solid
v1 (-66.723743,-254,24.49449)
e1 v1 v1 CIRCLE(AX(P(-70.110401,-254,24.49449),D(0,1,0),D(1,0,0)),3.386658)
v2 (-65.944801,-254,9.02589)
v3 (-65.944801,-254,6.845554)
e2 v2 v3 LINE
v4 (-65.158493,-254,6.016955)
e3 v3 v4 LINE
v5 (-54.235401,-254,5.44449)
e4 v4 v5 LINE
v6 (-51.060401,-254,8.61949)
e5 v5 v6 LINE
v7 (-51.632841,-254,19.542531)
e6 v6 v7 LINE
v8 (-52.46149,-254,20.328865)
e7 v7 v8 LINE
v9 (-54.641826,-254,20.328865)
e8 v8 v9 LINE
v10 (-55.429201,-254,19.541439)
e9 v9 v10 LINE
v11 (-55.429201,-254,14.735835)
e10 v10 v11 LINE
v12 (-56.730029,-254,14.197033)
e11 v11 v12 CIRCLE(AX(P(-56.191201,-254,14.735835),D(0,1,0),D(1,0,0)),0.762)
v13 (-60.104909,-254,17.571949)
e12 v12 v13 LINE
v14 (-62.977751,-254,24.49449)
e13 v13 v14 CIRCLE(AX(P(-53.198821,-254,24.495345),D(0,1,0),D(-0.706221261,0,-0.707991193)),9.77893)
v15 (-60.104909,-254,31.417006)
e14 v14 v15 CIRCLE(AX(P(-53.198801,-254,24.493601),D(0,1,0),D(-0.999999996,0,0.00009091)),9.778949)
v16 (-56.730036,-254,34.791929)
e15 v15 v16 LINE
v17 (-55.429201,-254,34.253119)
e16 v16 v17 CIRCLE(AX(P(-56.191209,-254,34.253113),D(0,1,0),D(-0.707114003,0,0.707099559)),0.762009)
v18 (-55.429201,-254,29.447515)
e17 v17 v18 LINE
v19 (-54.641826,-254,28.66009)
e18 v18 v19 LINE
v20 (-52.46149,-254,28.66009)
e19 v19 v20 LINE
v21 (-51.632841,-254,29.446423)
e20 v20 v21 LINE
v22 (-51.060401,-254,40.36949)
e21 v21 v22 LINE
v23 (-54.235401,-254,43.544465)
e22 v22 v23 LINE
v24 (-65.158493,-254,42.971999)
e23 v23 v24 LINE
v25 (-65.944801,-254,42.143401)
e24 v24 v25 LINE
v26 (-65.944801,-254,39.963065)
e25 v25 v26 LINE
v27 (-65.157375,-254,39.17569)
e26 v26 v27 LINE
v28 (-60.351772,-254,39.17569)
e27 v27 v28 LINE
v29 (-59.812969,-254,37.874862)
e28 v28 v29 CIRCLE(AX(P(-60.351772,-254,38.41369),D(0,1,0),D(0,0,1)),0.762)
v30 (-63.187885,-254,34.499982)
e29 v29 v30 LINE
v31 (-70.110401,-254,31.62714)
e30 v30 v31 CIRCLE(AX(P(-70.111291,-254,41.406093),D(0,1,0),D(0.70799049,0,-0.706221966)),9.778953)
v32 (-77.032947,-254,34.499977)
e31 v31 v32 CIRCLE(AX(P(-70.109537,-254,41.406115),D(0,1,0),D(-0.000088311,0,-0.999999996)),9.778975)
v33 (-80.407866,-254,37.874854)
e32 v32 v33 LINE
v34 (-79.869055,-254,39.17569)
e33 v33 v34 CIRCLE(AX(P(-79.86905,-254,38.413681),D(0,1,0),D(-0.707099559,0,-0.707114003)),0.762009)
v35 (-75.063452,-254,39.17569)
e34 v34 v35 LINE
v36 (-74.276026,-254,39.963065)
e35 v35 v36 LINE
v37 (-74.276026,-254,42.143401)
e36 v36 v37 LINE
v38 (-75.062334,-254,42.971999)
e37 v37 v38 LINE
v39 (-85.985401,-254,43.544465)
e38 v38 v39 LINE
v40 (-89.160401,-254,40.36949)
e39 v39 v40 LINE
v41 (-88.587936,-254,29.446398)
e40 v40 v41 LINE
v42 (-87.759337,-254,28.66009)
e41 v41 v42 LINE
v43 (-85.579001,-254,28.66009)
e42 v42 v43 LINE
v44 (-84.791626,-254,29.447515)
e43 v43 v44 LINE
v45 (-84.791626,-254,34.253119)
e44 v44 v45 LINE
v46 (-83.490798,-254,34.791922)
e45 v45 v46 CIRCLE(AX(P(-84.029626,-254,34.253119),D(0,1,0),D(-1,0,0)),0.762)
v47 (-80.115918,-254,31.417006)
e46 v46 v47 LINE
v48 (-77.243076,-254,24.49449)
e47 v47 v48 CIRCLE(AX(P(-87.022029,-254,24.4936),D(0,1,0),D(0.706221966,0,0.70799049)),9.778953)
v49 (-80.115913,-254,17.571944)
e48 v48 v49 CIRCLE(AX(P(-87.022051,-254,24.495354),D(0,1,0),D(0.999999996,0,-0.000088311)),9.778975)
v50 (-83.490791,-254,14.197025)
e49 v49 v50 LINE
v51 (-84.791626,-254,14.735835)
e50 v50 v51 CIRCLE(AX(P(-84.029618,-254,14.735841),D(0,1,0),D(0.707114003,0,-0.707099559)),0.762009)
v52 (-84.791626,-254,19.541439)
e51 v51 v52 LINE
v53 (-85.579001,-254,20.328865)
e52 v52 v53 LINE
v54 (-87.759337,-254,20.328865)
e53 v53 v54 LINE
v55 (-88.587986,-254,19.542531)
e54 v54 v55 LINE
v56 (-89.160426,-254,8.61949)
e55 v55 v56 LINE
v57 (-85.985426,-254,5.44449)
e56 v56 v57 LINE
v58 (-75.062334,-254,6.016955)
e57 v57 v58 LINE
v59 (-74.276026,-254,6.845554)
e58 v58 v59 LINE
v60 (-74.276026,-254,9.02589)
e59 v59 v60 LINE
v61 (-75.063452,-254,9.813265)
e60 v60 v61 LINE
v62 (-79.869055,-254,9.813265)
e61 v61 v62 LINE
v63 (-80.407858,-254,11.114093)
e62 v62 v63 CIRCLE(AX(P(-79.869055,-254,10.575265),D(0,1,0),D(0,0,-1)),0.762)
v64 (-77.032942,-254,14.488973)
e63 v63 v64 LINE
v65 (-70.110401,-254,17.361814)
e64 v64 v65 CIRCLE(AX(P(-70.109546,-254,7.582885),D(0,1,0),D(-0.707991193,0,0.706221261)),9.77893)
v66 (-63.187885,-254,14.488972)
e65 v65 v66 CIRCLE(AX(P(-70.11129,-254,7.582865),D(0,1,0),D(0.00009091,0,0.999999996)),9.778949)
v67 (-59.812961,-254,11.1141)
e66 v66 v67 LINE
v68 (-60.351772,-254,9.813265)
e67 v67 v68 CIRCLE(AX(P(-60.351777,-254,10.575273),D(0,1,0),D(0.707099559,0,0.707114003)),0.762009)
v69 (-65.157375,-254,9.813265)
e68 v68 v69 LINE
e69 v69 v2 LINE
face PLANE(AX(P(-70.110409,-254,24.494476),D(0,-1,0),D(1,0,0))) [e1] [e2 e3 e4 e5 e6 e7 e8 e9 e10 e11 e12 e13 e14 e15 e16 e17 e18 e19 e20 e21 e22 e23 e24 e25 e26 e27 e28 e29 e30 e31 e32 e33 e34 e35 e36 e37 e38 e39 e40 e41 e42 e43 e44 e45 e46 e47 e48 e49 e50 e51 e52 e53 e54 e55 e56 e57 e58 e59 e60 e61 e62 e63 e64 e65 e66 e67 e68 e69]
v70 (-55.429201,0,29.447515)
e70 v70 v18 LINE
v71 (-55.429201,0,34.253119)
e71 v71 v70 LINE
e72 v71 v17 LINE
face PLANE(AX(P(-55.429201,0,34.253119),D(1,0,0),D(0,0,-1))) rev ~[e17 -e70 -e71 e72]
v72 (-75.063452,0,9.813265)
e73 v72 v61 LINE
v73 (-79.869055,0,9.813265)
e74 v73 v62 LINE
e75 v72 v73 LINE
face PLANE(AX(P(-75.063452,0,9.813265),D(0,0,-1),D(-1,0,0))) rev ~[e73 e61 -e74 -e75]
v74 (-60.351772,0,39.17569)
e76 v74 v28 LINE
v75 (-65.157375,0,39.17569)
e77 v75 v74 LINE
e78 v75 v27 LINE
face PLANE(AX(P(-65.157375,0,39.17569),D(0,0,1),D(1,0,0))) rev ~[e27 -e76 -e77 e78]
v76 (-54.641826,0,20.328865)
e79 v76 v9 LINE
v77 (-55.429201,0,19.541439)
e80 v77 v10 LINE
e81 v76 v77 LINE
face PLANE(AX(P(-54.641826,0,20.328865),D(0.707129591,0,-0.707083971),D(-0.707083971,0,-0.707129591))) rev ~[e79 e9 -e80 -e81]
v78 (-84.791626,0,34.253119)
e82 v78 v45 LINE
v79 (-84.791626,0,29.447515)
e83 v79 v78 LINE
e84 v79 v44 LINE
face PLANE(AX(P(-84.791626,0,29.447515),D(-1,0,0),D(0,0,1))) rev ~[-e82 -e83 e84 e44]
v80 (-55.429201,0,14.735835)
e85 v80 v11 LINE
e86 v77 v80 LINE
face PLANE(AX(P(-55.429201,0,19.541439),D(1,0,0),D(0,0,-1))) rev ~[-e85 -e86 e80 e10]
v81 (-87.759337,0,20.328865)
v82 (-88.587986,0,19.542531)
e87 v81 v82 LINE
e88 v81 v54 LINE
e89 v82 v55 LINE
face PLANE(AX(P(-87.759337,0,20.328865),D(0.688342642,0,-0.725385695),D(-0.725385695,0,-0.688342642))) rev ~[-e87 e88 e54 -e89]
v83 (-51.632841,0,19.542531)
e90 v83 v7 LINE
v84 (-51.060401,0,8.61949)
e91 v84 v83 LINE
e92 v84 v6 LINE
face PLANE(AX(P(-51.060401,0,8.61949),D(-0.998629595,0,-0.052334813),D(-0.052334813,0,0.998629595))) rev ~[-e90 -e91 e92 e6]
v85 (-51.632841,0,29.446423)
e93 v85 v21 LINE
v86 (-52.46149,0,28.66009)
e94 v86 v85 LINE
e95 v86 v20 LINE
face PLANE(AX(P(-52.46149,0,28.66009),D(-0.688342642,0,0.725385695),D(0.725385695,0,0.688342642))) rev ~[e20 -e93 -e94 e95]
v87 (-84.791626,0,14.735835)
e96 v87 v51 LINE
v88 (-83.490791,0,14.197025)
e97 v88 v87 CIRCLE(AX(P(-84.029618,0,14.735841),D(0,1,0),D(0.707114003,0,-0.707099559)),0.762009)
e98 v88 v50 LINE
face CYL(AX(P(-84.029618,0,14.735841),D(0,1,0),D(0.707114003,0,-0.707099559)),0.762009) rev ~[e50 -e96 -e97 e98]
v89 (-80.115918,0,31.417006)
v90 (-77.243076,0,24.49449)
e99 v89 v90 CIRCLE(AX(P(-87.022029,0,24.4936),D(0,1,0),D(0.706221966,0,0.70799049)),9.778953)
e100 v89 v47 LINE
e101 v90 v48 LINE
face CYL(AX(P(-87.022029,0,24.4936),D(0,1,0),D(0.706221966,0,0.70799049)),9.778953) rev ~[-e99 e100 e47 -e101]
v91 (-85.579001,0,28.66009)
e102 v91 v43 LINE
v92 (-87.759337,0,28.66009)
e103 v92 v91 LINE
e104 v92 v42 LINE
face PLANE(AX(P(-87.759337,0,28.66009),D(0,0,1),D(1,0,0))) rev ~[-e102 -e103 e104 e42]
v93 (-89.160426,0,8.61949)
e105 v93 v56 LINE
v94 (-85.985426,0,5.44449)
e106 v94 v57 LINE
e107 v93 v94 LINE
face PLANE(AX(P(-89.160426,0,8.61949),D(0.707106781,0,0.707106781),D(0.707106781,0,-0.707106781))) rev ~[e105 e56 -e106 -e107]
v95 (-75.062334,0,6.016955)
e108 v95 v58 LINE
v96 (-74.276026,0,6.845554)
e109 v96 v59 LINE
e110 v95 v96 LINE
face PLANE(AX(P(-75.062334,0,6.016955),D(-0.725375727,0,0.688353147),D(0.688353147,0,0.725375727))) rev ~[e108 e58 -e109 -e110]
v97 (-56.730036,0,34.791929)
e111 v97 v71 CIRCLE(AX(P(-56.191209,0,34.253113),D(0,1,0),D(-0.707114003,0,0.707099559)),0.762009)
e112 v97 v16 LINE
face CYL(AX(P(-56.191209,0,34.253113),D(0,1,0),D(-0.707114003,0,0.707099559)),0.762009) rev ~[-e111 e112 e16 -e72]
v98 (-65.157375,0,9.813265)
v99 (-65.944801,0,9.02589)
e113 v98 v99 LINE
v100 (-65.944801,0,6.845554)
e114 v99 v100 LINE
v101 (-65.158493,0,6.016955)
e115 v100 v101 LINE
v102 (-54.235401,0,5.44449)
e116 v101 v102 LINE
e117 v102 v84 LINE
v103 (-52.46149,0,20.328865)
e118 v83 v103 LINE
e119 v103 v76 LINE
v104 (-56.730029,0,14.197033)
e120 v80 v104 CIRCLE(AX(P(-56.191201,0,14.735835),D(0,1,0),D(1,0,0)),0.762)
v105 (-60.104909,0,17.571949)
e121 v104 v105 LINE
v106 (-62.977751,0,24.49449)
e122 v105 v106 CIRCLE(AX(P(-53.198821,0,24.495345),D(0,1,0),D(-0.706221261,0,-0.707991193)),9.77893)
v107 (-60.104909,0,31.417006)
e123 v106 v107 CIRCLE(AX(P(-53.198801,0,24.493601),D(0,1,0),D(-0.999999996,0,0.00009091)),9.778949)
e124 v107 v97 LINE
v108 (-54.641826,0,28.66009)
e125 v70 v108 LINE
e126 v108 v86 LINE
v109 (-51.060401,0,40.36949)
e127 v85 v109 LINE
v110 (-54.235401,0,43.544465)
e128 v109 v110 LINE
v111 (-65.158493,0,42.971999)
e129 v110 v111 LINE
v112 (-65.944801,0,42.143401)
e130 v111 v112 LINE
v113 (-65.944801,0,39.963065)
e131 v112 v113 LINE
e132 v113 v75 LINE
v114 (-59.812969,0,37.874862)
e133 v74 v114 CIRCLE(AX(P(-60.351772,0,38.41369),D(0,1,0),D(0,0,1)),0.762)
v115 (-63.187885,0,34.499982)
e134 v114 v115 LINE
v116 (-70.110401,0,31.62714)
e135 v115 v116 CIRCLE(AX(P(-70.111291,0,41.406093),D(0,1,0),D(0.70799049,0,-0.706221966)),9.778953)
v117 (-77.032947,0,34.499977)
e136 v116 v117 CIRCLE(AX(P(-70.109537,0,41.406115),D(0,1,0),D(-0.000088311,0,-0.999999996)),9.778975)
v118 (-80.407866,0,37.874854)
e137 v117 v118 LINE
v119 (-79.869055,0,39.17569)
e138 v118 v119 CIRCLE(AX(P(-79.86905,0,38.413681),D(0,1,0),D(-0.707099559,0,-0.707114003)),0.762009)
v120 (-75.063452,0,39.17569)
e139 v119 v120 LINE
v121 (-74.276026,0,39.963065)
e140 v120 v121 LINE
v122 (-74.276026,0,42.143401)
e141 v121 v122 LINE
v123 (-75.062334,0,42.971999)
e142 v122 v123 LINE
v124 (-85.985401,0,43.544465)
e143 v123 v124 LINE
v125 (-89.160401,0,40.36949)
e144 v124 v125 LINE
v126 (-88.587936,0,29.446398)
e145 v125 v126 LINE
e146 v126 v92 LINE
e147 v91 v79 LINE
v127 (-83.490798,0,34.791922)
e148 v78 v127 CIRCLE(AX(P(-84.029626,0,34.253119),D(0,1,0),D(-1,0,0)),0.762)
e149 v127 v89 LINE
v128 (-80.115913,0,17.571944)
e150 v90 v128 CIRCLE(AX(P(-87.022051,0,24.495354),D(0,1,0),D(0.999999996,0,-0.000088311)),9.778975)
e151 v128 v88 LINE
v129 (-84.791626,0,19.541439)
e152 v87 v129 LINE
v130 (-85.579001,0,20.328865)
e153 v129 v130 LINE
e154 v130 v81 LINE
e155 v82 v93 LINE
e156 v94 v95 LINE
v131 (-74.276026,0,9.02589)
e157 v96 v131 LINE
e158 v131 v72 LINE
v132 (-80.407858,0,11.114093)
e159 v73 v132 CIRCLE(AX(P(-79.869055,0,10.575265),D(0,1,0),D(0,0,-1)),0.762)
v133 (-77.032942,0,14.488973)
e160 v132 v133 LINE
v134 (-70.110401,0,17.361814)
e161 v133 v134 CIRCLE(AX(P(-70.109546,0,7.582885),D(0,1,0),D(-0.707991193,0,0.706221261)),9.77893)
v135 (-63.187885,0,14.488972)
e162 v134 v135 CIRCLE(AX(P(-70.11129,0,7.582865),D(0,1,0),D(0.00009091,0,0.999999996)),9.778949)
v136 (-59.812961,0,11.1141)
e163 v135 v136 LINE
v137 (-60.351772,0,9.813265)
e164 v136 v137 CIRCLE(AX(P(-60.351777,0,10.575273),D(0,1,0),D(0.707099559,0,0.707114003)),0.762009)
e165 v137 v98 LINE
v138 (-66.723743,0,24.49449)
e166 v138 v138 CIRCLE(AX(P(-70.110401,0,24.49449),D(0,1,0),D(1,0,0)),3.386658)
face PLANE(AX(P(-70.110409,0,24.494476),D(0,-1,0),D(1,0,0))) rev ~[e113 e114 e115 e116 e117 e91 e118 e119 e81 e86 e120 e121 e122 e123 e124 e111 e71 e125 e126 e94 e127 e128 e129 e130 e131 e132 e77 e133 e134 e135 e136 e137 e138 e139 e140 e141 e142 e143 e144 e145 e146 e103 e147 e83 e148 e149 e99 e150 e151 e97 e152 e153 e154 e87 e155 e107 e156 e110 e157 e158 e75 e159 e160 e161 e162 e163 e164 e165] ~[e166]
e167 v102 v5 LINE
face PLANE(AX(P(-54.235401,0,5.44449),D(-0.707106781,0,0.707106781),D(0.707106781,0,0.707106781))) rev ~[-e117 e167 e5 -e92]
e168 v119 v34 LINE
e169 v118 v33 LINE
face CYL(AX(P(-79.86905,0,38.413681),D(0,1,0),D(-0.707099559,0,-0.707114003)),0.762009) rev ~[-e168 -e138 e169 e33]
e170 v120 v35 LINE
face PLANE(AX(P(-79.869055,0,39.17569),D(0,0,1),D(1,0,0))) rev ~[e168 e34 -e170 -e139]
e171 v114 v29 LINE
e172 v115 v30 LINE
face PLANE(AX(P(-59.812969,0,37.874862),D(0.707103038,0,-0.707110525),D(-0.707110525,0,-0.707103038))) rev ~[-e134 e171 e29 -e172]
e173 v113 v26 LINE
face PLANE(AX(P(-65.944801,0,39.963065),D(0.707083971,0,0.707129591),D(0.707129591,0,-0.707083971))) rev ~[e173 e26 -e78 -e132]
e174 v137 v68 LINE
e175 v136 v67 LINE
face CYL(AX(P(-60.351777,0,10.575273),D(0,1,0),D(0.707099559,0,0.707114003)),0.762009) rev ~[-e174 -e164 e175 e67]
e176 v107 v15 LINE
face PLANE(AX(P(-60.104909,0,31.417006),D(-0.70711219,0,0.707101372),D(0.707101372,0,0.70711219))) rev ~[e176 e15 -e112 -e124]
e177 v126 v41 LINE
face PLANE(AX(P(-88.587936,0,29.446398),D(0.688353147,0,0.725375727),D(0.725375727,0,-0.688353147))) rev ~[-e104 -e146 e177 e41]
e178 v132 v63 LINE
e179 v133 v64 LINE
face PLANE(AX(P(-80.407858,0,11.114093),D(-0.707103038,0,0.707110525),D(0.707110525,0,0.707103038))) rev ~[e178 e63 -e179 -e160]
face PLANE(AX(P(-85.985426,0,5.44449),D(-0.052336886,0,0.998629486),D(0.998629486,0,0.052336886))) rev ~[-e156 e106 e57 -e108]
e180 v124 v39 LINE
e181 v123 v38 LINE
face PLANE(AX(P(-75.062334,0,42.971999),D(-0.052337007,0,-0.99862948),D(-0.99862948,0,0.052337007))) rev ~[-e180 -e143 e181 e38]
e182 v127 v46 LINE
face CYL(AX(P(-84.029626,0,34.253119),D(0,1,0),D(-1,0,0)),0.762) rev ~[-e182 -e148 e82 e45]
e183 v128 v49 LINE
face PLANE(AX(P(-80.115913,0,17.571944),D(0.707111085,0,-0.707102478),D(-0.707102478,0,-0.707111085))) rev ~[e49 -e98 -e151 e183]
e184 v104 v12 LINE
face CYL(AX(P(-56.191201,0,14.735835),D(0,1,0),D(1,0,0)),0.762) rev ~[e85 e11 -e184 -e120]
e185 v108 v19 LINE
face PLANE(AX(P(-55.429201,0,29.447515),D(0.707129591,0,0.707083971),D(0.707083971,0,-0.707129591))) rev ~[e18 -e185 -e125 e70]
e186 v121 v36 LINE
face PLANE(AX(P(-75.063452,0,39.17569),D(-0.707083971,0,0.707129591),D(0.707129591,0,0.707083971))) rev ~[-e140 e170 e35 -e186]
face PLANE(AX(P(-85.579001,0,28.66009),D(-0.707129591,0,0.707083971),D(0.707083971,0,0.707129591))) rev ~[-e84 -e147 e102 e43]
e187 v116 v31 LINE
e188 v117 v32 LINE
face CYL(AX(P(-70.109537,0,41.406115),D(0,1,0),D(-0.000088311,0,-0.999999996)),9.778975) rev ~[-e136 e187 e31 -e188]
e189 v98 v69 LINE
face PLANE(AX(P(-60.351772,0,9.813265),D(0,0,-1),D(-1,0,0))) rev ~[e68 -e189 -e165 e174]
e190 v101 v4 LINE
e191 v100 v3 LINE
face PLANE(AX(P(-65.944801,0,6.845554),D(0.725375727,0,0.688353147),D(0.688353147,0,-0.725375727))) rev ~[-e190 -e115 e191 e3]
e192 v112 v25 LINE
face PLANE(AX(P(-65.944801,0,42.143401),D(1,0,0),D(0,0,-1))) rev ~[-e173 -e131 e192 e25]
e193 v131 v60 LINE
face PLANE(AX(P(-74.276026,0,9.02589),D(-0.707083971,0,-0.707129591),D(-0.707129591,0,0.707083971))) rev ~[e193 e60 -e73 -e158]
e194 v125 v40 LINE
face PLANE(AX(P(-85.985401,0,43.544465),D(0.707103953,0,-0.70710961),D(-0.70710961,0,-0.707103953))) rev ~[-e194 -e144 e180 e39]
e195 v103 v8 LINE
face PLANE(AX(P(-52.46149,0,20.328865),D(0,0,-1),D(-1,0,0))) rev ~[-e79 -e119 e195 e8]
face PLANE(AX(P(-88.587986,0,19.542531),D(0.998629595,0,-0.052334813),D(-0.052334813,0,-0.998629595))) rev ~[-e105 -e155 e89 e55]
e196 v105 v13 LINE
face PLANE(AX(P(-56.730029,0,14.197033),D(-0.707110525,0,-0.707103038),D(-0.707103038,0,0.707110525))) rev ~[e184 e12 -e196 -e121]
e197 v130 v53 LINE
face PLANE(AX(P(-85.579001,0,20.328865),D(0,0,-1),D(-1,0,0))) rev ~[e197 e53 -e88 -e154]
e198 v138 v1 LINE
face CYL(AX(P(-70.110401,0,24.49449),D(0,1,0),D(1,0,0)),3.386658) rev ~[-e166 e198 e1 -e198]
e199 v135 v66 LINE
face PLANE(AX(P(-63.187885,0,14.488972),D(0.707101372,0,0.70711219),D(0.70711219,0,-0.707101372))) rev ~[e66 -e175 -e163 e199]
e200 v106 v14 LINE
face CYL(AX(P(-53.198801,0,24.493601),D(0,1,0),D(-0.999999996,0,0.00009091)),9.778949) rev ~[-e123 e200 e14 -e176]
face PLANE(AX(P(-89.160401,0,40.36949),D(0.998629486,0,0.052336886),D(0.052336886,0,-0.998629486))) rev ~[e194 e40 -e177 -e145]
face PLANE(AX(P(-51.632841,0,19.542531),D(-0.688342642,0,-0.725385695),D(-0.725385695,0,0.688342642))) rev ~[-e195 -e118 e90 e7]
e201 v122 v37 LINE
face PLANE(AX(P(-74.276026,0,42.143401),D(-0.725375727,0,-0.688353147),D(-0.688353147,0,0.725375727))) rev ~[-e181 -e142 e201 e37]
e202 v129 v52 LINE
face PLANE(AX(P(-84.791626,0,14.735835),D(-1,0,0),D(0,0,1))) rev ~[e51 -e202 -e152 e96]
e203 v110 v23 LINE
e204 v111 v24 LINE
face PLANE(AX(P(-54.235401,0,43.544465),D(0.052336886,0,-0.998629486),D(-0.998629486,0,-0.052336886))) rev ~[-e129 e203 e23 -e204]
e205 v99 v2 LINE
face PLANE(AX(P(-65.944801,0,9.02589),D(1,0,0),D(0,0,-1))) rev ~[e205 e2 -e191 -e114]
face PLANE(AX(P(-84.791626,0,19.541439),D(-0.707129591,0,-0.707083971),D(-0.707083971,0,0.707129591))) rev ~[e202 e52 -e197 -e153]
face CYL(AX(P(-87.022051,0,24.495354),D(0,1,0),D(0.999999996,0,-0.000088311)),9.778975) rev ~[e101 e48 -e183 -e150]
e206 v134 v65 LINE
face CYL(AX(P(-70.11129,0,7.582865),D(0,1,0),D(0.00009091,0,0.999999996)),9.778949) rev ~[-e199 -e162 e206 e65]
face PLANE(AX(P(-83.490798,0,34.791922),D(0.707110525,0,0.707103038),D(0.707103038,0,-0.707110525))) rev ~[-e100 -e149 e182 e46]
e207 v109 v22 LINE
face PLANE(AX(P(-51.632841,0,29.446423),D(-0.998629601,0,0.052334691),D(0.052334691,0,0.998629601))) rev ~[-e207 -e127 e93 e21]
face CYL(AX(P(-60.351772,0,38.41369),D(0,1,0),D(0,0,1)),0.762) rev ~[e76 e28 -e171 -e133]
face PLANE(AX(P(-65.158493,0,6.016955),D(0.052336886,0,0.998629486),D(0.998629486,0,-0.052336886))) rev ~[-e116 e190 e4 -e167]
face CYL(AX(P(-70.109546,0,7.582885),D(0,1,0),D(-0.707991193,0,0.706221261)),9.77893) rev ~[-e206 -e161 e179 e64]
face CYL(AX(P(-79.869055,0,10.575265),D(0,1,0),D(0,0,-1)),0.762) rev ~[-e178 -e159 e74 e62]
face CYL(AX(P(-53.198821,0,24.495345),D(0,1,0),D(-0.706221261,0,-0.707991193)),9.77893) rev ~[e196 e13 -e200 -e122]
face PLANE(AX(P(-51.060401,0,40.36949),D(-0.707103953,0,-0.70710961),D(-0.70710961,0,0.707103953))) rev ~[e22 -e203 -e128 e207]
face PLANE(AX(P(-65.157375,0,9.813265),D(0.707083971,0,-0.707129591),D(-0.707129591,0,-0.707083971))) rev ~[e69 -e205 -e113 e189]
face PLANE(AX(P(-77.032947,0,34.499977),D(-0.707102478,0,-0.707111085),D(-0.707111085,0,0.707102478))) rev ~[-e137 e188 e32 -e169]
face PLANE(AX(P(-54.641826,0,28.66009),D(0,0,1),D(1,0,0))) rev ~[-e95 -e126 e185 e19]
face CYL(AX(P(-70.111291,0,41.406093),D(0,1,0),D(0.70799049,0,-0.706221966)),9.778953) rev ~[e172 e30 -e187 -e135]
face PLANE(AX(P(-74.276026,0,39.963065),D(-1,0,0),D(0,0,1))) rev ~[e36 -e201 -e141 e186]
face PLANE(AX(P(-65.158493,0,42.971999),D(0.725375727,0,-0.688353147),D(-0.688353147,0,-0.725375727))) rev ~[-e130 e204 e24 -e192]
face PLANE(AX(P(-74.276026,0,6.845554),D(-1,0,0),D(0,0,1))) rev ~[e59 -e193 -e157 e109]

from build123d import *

# Parameters (mm, degrees)
F1_DEPTH = 254


# Not quite as in the source:
# - ends of sketch curves that miss each other by under 0.0002 mm in the source are joined


with BuildPart() as f1:
    # F0 (on Front) → F1 (new body)
    with BuildSketch(Plane.XZ):
        with BuildLine():
            Line((-51.0604008, 40.36949), (-54.2354008, 43.5444646))
            Line((-54.2354008, 43.5444646), (-65.158493, 42.9719994))
            Line((-65.158493, 42.9719994), (-65.9448008, 42.1434006))
            Line((-65.9448008, 42.1434006), (-65.9448008, 39.9630646))
            Line((-65.9448008, 39.9630646), (-65.1573754, 39.17569))
            Line((-65.1573754, 39.17569), (-60.3517716, 39.17569))
            ThreePointArc((-60.3517716, 39.17569), (-59.6477719597, 38.7052864789), (-59.8129689327, 37.8748619331))
            Line((-59.8129689327, 37.8748619331), (-63.1878848, 34.4999818))
            ThreePointArc((-63.1878848, 34.4999818), (-66.3629880966, 32.3740308419), (-70.1104008, 31.6271402404))
            ThreePointArc((-70.1104008, 31.6271402404), (-73.8578286035, 32.3740244671), (-77.0329470659, 34.4999769462))
            Line((-77.0329470659, 34.4999769462), (-80.4078656, 37.8748544))
            ThreePointArc((-80.4078656, 37.8748544), (-80.5730550403, 38.7052864789), (-79.8690554, 39.17569))
            Line((-79.8690554, 39.17569), (-75.0634516, 39.17569))
            Line((-75.0634516, 39.17569), (-74.2760262, 39.9630646))
            Line((-74.2760262, 39.9630646), (-74.2760262, 42.1434006))
            Line((-74.2760262, 42.1434006), (-75.062334, 42.9719994))
            Line((-75.062334, 42.9719994), (-85.9854008, 43.5444646))
            Line((-85.9854008, 43.5444646), (-89.1604008, 40.36949))
            Line((-89.1604008, 40.36949), (-88.5879356, 29.4463978))
            Line((-88.5879356, 29.4463978), (-87.7593368, 28.66009))
            Line((-87.7593368, 28.66009), (-85.5790008, 28.66009))
            Line((-85.5790008, 28.66009), (-84.7916262, 29.4475154))
            Line((-84.7916262, 29.4475154), (-84.7916262, 34.2531192))
            ThreePointArc((-84.7916262, 34.2531192), (-84.3212226789, 34.9571188403), (-83.4907981331, 34.7919218673))
            Line((-83.4907981331, 34.7919218673), (-80.115918, 31.417006))
            ThreePointArc((-80.115918, 31.417006), (-77.9899670419, 28.2419027034), (-77.2430764404, 24.49449))
            ThreePointArc((-77.2430764404, 24.49449), (-77.9899606671, 20.7470621965), (-80.1159131462, 17.5719437341))
            Line((-80.1159131462, 17.5719437341), (-83.4907906, 14.1970252))
            ThreePointArc((-83.4907906, 14.1970252), (-84.3212226789, 14.0318357597), (-84.7916262, 14.7358354))
            Line((-84.7916262, 14.7358354), (-84.7916262, 19.5414392))
            Line((-84.7916262, 19.5414392), (-85.5790008, 20.3288646))
            Line((-85.5790008, 20.3288646), (-87.7593368, 20.3288646))
            Line((-87.7593368, 20.3288646), (-88.5879864, 19.5425314))
            Line((-88.5879864, 19.5425314), (-89.1604262, 8.61949))
            Line((-89.1604262, 8.61949), (-85.9854262, 5.44449))
            Line((-85.9854262, 5.44449), (-75.062334, 6.0169552))
            Line((-75.062334, 6.0169552), (-74.2760262, 6.845554))
            Line((-74.2760262, 6.845554), (-74.2760262, 9.02589))
            Line((-74.2760262, 9.02589), (-75.0634516, 9.8132646))
            Line((-75.0634516, 9.8132646), (-79.8690554, 9.8132646))
            ThreePointArc((-79.8690554, 9.8132646), (-80.5730550403, 10.2836681211), (-80.4078580673, 11.1140926669))
            Line((-80.4078580673, 11.1140926669), (-77.0329422, 14.4889728))
            ThreePointArc((-77.0329422, 14.4889728), (-73.8578286035, 16.6149301329), (-70.1104008, 17.3618143619))
            ThreePointArc((-70.1104008, 17.3618143619), (-66.3629880966, 16.6149237581), (-63.187885217, 14.488972384))
            Line((-63.187885217, 14.488972384), (-59.8129614, 11.1141002))
            ThreePointArc((-59.8129614, 11.1141002), (-59.6477719597, 10.2836681211), (-60.3517716, 9.8132646))
            Line((-60.3517716, 9.8132646), (-65.1573754, 9.8132646))
            Line((-65.1573754, 9.8132646), (-65.9448008, 9.02589))
            Line((-65.9448008, 9.02589), (-65.9448008, 6.845554))
            Line((-65.9448008, 6.845554), (-65.158493, 6.0169552))
            Line((-65.158493, 6.0169552), (-54.2354008, 5.44449))
            Line((-54.2354008, 5.44449), (-51.0604008, 8.61949))
            Line((-51.0604008, 8.61949), (-51.6328406, 19.5425314))
            Line((-51.6328406, 19.5425314), (-52.4614902, 20.3288646))
            Line((-52.4614902, 20.3288646), (-54.6418262, 20.3288646))
            Line((-54.6418262, 20.3288646), (-55.4292008, 19.5414392))
            Line((-55.4292008, 19.5414392), (-55.4292008, 14.7358354))
            ThreePointArc((-55.4292008, 14.7358354), (-55.8996043211, 14.0318357597), (-56.7300288669, 14.1970327327))
            Line((-56.7300288669, 14.1970327327), (-60.104909, 17.5719486))
            ThreePointArc((-60.104909, 17.5719486), (-62.2308663329, 20.7470621965), (-62.9777505619, 24.49449))
            ThreePointArc((-62.9777505619, 24.49449), (-62.2308599581, 28.2419027034), (-60.104908584, 31.417005583))
            Line((-60.104908584, 31.417005583), (-56.7300364, 34.7919294))
            ThreePointArc((-56.7300364, 34.7919294), (-55.8996043211, 34.9571188403), (-55.4292008, 34.2531192))
            Line((-55.4292008, 34.2531192), (-55.4292008, 29.4475154))
            Line((-55.4292008, 29.4475154), (-54.6418262, 28.66009))
            Line((-54.6418262, 28.66009), (-52.4614902, 28.66009))
            Line((-52.4614902, 28.66009), (-51.6328406, 29.4464232))
            Line((-51.6328406, 29.4464232), (-51.0604008, 40.36949))
        make_face()
        with BuildLine():
            ThreePointArc((-73.497059, 24.49449), (-70.1104008, 27.8811482), (-66.7237426, 24.49449))
            ThreePointArc((-66.7237426, 24.49449), (-70.1104008, 21.1078318), (-73.497059, 24.49449))
        make_face(mode=Mode.SUBTRACT)
    extrude(amount=F1_DEPTH)


solid = f1.part
